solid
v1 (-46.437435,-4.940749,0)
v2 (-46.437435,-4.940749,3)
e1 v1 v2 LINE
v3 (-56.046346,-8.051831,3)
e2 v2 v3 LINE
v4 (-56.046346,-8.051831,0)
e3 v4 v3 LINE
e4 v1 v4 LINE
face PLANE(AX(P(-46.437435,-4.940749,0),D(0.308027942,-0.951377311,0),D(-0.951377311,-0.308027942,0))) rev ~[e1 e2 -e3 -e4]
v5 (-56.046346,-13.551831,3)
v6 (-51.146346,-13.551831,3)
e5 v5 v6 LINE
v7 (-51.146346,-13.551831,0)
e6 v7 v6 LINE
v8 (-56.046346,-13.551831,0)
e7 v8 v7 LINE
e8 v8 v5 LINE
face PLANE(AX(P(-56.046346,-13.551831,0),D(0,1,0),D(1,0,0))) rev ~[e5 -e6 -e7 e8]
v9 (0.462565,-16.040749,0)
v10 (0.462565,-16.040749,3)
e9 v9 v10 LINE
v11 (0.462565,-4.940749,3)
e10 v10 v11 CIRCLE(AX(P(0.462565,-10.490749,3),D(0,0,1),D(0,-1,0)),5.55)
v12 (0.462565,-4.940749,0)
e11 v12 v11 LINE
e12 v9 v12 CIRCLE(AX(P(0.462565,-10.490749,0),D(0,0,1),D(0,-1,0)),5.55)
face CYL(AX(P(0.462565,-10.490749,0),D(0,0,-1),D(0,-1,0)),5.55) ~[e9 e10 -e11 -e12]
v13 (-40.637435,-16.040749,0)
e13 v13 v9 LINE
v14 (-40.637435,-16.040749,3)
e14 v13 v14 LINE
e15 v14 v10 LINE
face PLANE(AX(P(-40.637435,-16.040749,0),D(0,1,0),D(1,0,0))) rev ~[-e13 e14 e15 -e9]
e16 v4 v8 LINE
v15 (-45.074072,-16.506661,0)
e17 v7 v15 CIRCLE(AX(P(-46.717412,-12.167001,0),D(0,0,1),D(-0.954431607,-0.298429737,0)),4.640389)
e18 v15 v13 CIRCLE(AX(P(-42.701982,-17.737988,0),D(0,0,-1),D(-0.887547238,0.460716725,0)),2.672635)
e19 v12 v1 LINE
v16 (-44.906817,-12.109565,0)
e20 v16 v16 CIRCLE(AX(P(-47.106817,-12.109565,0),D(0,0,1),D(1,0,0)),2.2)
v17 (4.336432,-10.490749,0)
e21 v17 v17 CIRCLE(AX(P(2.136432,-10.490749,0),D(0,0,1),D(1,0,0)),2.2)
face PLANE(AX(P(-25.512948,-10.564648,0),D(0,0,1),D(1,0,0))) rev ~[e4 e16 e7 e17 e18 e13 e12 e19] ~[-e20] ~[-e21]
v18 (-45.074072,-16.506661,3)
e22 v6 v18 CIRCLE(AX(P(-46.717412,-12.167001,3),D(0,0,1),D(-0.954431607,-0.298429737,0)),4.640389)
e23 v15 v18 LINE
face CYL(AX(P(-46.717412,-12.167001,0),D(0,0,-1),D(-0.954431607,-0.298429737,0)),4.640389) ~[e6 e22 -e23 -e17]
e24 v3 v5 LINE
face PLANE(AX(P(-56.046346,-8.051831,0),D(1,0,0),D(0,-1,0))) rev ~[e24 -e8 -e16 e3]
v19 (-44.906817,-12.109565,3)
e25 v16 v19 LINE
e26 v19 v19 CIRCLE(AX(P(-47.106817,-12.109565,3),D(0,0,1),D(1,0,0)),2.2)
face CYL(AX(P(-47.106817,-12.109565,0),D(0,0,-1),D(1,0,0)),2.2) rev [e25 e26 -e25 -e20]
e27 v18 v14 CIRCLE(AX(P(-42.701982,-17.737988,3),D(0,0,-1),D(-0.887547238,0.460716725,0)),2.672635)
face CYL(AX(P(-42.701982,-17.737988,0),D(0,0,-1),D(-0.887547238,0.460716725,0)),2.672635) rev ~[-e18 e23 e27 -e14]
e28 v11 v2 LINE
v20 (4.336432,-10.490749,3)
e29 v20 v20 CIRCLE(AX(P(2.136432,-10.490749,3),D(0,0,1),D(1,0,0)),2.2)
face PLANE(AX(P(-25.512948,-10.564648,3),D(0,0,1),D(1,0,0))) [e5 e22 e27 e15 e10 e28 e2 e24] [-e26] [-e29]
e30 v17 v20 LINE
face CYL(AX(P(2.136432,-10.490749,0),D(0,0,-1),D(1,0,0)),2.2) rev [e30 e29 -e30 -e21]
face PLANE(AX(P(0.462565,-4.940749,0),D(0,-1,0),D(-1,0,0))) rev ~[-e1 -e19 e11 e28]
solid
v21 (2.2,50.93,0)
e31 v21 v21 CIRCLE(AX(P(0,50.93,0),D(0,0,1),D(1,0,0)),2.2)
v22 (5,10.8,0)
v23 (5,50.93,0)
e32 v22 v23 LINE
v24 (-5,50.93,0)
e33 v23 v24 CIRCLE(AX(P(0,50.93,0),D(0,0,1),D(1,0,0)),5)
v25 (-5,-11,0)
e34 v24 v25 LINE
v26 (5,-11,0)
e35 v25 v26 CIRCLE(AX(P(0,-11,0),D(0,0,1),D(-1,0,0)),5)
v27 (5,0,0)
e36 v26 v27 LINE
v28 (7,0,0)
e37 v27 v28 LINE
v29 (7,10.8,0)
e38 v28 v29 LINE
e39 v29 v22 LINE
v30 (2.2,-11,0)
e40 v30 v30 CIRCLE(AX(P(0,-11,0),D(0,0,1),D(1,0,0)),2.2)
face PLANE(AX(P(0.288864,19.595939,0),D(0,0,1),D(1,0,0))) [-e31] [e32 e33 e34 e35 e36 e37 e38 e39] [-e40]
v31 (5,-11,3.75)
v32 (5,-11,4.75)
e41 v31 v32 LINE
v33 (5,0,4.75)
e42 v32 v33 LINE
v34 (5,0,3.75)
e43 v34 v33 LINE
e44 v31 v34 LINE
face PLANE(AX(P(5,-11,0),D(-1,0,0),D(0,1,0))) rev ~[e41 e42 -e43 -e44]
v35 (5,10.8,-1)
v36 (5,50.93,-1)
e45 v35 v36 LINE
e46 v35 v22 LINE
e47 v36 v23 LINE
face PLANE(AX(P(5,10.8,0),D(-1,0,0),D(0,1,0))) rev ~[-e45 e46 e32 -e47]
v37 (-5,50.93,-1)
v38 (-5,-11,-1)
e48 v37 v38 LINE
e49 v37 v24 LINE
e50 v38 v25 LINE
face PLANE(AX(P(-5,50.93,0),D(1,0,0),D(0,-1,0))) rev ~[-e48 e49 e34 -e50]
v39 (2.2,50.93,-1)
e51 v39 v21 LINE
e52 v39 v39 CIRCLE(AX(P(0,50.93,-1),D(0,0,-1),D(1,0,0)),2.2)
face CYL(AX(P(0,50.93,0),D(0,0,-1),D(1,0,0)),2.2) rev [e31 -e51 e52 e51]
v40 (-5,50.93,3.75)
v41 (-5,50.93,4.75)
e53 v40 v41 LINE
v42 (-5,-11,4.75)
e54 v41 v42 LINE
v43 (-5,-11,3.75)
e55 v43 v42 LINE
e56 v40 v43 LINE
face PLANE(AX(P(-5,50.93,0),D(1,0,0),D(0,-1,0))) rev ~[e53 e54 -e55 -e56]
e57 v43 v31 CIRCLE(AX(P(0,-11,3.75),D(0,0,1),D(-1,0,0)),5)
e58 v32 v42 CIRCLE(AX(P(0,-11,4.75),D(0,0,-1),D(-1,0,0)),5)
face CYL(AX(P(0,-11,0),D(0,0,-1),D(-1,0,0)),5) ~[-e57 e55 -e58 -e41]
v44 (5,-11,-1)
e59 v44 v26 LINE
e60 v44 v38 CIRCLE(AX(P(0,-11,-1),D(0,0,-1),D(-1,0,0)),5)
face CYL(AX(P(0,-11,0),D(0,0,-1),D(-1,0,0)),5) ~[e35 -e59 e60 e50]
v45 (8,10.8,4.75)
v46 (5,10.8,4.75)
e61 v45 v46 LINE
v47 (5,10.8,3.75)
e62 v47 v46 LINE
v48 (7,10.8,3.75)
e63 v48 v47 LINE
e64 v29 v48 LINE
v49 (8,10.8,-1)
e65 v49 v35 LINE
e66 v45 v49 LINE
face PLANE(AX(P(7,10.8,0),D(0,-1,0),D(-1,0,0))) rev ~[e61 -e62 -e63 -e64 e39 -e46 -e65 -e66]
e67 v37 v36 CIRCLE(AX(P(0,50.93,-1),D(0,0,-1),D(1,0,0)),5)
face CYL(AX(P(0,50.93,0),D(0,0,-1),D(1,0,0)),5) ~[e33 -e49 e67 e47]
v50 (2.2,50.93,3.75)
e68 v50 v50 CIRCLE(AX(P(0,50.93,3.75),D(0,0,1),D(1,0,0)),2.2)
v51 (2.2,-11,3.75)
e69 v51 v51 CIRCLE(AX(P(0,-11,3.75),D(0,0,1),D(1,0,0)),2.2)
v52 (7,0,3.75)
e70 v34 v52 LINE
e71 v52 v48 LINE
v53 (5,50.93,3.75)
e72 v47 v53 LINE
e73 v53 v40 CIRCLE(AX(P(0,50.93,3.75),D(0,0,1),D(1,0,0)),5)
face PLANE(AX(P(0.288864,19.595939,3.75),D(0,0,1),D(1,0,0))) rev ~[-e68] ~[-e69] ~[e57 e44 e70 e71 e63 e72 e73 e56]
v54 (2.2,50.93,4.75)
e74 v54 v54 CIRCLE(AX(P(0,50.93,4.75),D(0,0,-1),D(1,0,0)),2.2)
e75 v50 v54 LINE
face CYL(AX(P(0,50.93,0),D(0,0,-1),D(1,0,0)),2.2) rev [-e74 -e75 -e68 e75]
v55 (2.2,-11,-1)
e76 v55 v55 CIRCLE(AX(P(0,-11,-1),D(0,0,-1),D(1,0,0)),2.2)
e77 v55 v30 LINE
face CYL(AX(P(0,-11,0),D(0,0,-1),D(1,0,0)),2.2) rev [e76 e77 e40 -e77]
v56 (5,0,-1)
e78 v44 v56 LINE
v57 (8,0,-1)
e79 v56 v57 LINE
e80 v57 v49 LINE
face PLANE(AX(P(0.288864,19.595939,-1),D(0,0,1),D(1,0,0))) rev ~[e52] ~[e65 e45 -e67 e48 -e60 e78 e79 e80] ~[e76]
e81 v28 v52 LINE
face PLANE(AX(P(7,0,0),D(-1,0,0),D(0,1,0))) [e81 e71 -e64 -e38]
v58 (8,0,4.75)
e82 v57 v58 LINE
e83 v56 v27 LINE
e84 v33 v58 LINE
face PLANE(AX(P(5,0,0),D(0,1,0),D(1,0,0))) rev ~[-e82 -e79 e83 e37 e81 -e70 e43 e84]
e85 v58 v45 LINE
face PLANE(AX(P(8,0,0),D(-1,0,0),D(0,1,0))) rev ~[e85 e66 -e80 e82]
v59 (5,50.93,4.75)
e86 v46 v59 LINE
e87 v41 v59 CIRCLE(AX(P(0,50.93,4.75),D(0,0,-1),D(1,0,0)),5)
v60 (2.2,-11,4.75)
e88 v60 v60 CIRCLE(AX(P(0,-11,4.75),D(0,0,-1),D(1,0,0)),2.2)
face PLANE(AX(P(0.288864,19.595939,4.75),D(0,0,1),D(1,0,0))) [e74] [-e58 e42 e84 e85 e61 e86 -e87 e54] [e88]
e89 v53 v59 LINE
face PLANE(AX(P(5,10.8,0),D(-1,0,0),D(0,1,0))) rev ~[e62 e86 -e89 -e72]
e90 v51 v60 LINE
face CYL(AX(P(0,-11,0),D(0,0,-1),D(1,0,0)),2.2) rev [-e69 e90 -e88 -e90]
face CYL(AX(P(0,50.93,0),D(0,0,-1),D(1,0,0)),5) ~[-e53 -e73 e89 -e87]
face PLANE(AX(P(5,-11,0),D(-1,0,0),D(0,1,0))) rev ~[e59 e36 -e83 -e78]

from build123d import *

# Parameters (mm, degrees)
F0_R     = 2.2
F1_DEPTH = 3.75
F2_T     = 1
F3_R     = 2.2
F4_DEPTH = 3


with BuildPart() as f1:
    # F0 (on Top) → F1 (new body)
    with BuildSketch(Plane.XY):
        with BuildLine():
            Line((-5, 50.93), (-5, 0))
            Line((-5, 0), (-5, -11))
            ThreePointArc((-5, -11), (0, -16), (5, -11))
            Line((5, -11), (5, 0))
            Line((5, 0), (7, 0))
            Line((7, 0), (7, 10.8))
            Line((7, 10.8), (5, 10.8))
            Line((5, 10.8), (5, 50.93))
            ThreePointArc((5, 50.93), (0, 55.93), (-5, 50.93))
        make_face()
        with Locations((0, -11)):
            Circle(F0_R, mode=Mode.SUBTRACT)
        with Locations((0, 50.93)):
            Circle(F0_R, mode=Mode.SUBTRACT)
    extrude(amount=F1_DEPTH)

    # F2
    f2_openings = [f1.faces().sort_by_distance(p)[0] for p in [
        (-5, 19.965, 1.875),
        (0, 55.93, 1.875),
        (0, -16, 1.875),
        (5, -5.5, 1.875),
        (6, 0, 1.875),
        (6, 10.8, 1.875),
        (5, 30.865, 1.875),
        (-2.2, 50.93, 1.875),
        (-2.2, -11, 1.875),
    ]]
    offset(amount=F2_T, openings=f2_openings, kind=Kind.INTERSECTION)


with BuildPart() as f4:
    # F3 (on Top) → F4 (new body)
    with BuildSketch(Plane.XY):
        with BuildLine():
            Line((0.4625649198, -4.9407491021), (-46.4374350802, -4.9407491021))
            Line((-46.4374350802, -4.9407491021), (-56.0463459179, -8.0518313113))
            Line((-56.0463459179, -8.0518313113), (-56.0463459179, -13.5518313113))
            Line((-56.0463459179, -13.5518313113), (-51.1463459179, -13.5518313113))
            ThreePointArc((-51.1463459179, -13.5518313113), (-48.7478397903, -16.3395991716), (-45.0740717351, -16.5066607296))
            ThreePointArc((-45.0740717351, -16.5066607296), (-42.9811130235, -15.0799698083), (-40.6374350802, -16.0407491021))
            Line((-40.6374350802, -16.0407491021), (0.4625649198, -16.0407491021))
            ThreePointArc((0.4625649198, -16.0407491021), (6.0125649198, -10.4907491021), (0.4625649198, -4.9407491021))
        make_face()
        with Locations((-47.1068173292, -12.1095654204)):
            Circle(F3_R, mode=Mode.SUBTRACT)
        with Locations((2.1364323051, -10.4907491021)):
            Circle(F3_R, mode=Mode.SUBTRACT)
    extrude(amount=F4_DEPTH)


solid = Compound([f1.part, f4.part])
